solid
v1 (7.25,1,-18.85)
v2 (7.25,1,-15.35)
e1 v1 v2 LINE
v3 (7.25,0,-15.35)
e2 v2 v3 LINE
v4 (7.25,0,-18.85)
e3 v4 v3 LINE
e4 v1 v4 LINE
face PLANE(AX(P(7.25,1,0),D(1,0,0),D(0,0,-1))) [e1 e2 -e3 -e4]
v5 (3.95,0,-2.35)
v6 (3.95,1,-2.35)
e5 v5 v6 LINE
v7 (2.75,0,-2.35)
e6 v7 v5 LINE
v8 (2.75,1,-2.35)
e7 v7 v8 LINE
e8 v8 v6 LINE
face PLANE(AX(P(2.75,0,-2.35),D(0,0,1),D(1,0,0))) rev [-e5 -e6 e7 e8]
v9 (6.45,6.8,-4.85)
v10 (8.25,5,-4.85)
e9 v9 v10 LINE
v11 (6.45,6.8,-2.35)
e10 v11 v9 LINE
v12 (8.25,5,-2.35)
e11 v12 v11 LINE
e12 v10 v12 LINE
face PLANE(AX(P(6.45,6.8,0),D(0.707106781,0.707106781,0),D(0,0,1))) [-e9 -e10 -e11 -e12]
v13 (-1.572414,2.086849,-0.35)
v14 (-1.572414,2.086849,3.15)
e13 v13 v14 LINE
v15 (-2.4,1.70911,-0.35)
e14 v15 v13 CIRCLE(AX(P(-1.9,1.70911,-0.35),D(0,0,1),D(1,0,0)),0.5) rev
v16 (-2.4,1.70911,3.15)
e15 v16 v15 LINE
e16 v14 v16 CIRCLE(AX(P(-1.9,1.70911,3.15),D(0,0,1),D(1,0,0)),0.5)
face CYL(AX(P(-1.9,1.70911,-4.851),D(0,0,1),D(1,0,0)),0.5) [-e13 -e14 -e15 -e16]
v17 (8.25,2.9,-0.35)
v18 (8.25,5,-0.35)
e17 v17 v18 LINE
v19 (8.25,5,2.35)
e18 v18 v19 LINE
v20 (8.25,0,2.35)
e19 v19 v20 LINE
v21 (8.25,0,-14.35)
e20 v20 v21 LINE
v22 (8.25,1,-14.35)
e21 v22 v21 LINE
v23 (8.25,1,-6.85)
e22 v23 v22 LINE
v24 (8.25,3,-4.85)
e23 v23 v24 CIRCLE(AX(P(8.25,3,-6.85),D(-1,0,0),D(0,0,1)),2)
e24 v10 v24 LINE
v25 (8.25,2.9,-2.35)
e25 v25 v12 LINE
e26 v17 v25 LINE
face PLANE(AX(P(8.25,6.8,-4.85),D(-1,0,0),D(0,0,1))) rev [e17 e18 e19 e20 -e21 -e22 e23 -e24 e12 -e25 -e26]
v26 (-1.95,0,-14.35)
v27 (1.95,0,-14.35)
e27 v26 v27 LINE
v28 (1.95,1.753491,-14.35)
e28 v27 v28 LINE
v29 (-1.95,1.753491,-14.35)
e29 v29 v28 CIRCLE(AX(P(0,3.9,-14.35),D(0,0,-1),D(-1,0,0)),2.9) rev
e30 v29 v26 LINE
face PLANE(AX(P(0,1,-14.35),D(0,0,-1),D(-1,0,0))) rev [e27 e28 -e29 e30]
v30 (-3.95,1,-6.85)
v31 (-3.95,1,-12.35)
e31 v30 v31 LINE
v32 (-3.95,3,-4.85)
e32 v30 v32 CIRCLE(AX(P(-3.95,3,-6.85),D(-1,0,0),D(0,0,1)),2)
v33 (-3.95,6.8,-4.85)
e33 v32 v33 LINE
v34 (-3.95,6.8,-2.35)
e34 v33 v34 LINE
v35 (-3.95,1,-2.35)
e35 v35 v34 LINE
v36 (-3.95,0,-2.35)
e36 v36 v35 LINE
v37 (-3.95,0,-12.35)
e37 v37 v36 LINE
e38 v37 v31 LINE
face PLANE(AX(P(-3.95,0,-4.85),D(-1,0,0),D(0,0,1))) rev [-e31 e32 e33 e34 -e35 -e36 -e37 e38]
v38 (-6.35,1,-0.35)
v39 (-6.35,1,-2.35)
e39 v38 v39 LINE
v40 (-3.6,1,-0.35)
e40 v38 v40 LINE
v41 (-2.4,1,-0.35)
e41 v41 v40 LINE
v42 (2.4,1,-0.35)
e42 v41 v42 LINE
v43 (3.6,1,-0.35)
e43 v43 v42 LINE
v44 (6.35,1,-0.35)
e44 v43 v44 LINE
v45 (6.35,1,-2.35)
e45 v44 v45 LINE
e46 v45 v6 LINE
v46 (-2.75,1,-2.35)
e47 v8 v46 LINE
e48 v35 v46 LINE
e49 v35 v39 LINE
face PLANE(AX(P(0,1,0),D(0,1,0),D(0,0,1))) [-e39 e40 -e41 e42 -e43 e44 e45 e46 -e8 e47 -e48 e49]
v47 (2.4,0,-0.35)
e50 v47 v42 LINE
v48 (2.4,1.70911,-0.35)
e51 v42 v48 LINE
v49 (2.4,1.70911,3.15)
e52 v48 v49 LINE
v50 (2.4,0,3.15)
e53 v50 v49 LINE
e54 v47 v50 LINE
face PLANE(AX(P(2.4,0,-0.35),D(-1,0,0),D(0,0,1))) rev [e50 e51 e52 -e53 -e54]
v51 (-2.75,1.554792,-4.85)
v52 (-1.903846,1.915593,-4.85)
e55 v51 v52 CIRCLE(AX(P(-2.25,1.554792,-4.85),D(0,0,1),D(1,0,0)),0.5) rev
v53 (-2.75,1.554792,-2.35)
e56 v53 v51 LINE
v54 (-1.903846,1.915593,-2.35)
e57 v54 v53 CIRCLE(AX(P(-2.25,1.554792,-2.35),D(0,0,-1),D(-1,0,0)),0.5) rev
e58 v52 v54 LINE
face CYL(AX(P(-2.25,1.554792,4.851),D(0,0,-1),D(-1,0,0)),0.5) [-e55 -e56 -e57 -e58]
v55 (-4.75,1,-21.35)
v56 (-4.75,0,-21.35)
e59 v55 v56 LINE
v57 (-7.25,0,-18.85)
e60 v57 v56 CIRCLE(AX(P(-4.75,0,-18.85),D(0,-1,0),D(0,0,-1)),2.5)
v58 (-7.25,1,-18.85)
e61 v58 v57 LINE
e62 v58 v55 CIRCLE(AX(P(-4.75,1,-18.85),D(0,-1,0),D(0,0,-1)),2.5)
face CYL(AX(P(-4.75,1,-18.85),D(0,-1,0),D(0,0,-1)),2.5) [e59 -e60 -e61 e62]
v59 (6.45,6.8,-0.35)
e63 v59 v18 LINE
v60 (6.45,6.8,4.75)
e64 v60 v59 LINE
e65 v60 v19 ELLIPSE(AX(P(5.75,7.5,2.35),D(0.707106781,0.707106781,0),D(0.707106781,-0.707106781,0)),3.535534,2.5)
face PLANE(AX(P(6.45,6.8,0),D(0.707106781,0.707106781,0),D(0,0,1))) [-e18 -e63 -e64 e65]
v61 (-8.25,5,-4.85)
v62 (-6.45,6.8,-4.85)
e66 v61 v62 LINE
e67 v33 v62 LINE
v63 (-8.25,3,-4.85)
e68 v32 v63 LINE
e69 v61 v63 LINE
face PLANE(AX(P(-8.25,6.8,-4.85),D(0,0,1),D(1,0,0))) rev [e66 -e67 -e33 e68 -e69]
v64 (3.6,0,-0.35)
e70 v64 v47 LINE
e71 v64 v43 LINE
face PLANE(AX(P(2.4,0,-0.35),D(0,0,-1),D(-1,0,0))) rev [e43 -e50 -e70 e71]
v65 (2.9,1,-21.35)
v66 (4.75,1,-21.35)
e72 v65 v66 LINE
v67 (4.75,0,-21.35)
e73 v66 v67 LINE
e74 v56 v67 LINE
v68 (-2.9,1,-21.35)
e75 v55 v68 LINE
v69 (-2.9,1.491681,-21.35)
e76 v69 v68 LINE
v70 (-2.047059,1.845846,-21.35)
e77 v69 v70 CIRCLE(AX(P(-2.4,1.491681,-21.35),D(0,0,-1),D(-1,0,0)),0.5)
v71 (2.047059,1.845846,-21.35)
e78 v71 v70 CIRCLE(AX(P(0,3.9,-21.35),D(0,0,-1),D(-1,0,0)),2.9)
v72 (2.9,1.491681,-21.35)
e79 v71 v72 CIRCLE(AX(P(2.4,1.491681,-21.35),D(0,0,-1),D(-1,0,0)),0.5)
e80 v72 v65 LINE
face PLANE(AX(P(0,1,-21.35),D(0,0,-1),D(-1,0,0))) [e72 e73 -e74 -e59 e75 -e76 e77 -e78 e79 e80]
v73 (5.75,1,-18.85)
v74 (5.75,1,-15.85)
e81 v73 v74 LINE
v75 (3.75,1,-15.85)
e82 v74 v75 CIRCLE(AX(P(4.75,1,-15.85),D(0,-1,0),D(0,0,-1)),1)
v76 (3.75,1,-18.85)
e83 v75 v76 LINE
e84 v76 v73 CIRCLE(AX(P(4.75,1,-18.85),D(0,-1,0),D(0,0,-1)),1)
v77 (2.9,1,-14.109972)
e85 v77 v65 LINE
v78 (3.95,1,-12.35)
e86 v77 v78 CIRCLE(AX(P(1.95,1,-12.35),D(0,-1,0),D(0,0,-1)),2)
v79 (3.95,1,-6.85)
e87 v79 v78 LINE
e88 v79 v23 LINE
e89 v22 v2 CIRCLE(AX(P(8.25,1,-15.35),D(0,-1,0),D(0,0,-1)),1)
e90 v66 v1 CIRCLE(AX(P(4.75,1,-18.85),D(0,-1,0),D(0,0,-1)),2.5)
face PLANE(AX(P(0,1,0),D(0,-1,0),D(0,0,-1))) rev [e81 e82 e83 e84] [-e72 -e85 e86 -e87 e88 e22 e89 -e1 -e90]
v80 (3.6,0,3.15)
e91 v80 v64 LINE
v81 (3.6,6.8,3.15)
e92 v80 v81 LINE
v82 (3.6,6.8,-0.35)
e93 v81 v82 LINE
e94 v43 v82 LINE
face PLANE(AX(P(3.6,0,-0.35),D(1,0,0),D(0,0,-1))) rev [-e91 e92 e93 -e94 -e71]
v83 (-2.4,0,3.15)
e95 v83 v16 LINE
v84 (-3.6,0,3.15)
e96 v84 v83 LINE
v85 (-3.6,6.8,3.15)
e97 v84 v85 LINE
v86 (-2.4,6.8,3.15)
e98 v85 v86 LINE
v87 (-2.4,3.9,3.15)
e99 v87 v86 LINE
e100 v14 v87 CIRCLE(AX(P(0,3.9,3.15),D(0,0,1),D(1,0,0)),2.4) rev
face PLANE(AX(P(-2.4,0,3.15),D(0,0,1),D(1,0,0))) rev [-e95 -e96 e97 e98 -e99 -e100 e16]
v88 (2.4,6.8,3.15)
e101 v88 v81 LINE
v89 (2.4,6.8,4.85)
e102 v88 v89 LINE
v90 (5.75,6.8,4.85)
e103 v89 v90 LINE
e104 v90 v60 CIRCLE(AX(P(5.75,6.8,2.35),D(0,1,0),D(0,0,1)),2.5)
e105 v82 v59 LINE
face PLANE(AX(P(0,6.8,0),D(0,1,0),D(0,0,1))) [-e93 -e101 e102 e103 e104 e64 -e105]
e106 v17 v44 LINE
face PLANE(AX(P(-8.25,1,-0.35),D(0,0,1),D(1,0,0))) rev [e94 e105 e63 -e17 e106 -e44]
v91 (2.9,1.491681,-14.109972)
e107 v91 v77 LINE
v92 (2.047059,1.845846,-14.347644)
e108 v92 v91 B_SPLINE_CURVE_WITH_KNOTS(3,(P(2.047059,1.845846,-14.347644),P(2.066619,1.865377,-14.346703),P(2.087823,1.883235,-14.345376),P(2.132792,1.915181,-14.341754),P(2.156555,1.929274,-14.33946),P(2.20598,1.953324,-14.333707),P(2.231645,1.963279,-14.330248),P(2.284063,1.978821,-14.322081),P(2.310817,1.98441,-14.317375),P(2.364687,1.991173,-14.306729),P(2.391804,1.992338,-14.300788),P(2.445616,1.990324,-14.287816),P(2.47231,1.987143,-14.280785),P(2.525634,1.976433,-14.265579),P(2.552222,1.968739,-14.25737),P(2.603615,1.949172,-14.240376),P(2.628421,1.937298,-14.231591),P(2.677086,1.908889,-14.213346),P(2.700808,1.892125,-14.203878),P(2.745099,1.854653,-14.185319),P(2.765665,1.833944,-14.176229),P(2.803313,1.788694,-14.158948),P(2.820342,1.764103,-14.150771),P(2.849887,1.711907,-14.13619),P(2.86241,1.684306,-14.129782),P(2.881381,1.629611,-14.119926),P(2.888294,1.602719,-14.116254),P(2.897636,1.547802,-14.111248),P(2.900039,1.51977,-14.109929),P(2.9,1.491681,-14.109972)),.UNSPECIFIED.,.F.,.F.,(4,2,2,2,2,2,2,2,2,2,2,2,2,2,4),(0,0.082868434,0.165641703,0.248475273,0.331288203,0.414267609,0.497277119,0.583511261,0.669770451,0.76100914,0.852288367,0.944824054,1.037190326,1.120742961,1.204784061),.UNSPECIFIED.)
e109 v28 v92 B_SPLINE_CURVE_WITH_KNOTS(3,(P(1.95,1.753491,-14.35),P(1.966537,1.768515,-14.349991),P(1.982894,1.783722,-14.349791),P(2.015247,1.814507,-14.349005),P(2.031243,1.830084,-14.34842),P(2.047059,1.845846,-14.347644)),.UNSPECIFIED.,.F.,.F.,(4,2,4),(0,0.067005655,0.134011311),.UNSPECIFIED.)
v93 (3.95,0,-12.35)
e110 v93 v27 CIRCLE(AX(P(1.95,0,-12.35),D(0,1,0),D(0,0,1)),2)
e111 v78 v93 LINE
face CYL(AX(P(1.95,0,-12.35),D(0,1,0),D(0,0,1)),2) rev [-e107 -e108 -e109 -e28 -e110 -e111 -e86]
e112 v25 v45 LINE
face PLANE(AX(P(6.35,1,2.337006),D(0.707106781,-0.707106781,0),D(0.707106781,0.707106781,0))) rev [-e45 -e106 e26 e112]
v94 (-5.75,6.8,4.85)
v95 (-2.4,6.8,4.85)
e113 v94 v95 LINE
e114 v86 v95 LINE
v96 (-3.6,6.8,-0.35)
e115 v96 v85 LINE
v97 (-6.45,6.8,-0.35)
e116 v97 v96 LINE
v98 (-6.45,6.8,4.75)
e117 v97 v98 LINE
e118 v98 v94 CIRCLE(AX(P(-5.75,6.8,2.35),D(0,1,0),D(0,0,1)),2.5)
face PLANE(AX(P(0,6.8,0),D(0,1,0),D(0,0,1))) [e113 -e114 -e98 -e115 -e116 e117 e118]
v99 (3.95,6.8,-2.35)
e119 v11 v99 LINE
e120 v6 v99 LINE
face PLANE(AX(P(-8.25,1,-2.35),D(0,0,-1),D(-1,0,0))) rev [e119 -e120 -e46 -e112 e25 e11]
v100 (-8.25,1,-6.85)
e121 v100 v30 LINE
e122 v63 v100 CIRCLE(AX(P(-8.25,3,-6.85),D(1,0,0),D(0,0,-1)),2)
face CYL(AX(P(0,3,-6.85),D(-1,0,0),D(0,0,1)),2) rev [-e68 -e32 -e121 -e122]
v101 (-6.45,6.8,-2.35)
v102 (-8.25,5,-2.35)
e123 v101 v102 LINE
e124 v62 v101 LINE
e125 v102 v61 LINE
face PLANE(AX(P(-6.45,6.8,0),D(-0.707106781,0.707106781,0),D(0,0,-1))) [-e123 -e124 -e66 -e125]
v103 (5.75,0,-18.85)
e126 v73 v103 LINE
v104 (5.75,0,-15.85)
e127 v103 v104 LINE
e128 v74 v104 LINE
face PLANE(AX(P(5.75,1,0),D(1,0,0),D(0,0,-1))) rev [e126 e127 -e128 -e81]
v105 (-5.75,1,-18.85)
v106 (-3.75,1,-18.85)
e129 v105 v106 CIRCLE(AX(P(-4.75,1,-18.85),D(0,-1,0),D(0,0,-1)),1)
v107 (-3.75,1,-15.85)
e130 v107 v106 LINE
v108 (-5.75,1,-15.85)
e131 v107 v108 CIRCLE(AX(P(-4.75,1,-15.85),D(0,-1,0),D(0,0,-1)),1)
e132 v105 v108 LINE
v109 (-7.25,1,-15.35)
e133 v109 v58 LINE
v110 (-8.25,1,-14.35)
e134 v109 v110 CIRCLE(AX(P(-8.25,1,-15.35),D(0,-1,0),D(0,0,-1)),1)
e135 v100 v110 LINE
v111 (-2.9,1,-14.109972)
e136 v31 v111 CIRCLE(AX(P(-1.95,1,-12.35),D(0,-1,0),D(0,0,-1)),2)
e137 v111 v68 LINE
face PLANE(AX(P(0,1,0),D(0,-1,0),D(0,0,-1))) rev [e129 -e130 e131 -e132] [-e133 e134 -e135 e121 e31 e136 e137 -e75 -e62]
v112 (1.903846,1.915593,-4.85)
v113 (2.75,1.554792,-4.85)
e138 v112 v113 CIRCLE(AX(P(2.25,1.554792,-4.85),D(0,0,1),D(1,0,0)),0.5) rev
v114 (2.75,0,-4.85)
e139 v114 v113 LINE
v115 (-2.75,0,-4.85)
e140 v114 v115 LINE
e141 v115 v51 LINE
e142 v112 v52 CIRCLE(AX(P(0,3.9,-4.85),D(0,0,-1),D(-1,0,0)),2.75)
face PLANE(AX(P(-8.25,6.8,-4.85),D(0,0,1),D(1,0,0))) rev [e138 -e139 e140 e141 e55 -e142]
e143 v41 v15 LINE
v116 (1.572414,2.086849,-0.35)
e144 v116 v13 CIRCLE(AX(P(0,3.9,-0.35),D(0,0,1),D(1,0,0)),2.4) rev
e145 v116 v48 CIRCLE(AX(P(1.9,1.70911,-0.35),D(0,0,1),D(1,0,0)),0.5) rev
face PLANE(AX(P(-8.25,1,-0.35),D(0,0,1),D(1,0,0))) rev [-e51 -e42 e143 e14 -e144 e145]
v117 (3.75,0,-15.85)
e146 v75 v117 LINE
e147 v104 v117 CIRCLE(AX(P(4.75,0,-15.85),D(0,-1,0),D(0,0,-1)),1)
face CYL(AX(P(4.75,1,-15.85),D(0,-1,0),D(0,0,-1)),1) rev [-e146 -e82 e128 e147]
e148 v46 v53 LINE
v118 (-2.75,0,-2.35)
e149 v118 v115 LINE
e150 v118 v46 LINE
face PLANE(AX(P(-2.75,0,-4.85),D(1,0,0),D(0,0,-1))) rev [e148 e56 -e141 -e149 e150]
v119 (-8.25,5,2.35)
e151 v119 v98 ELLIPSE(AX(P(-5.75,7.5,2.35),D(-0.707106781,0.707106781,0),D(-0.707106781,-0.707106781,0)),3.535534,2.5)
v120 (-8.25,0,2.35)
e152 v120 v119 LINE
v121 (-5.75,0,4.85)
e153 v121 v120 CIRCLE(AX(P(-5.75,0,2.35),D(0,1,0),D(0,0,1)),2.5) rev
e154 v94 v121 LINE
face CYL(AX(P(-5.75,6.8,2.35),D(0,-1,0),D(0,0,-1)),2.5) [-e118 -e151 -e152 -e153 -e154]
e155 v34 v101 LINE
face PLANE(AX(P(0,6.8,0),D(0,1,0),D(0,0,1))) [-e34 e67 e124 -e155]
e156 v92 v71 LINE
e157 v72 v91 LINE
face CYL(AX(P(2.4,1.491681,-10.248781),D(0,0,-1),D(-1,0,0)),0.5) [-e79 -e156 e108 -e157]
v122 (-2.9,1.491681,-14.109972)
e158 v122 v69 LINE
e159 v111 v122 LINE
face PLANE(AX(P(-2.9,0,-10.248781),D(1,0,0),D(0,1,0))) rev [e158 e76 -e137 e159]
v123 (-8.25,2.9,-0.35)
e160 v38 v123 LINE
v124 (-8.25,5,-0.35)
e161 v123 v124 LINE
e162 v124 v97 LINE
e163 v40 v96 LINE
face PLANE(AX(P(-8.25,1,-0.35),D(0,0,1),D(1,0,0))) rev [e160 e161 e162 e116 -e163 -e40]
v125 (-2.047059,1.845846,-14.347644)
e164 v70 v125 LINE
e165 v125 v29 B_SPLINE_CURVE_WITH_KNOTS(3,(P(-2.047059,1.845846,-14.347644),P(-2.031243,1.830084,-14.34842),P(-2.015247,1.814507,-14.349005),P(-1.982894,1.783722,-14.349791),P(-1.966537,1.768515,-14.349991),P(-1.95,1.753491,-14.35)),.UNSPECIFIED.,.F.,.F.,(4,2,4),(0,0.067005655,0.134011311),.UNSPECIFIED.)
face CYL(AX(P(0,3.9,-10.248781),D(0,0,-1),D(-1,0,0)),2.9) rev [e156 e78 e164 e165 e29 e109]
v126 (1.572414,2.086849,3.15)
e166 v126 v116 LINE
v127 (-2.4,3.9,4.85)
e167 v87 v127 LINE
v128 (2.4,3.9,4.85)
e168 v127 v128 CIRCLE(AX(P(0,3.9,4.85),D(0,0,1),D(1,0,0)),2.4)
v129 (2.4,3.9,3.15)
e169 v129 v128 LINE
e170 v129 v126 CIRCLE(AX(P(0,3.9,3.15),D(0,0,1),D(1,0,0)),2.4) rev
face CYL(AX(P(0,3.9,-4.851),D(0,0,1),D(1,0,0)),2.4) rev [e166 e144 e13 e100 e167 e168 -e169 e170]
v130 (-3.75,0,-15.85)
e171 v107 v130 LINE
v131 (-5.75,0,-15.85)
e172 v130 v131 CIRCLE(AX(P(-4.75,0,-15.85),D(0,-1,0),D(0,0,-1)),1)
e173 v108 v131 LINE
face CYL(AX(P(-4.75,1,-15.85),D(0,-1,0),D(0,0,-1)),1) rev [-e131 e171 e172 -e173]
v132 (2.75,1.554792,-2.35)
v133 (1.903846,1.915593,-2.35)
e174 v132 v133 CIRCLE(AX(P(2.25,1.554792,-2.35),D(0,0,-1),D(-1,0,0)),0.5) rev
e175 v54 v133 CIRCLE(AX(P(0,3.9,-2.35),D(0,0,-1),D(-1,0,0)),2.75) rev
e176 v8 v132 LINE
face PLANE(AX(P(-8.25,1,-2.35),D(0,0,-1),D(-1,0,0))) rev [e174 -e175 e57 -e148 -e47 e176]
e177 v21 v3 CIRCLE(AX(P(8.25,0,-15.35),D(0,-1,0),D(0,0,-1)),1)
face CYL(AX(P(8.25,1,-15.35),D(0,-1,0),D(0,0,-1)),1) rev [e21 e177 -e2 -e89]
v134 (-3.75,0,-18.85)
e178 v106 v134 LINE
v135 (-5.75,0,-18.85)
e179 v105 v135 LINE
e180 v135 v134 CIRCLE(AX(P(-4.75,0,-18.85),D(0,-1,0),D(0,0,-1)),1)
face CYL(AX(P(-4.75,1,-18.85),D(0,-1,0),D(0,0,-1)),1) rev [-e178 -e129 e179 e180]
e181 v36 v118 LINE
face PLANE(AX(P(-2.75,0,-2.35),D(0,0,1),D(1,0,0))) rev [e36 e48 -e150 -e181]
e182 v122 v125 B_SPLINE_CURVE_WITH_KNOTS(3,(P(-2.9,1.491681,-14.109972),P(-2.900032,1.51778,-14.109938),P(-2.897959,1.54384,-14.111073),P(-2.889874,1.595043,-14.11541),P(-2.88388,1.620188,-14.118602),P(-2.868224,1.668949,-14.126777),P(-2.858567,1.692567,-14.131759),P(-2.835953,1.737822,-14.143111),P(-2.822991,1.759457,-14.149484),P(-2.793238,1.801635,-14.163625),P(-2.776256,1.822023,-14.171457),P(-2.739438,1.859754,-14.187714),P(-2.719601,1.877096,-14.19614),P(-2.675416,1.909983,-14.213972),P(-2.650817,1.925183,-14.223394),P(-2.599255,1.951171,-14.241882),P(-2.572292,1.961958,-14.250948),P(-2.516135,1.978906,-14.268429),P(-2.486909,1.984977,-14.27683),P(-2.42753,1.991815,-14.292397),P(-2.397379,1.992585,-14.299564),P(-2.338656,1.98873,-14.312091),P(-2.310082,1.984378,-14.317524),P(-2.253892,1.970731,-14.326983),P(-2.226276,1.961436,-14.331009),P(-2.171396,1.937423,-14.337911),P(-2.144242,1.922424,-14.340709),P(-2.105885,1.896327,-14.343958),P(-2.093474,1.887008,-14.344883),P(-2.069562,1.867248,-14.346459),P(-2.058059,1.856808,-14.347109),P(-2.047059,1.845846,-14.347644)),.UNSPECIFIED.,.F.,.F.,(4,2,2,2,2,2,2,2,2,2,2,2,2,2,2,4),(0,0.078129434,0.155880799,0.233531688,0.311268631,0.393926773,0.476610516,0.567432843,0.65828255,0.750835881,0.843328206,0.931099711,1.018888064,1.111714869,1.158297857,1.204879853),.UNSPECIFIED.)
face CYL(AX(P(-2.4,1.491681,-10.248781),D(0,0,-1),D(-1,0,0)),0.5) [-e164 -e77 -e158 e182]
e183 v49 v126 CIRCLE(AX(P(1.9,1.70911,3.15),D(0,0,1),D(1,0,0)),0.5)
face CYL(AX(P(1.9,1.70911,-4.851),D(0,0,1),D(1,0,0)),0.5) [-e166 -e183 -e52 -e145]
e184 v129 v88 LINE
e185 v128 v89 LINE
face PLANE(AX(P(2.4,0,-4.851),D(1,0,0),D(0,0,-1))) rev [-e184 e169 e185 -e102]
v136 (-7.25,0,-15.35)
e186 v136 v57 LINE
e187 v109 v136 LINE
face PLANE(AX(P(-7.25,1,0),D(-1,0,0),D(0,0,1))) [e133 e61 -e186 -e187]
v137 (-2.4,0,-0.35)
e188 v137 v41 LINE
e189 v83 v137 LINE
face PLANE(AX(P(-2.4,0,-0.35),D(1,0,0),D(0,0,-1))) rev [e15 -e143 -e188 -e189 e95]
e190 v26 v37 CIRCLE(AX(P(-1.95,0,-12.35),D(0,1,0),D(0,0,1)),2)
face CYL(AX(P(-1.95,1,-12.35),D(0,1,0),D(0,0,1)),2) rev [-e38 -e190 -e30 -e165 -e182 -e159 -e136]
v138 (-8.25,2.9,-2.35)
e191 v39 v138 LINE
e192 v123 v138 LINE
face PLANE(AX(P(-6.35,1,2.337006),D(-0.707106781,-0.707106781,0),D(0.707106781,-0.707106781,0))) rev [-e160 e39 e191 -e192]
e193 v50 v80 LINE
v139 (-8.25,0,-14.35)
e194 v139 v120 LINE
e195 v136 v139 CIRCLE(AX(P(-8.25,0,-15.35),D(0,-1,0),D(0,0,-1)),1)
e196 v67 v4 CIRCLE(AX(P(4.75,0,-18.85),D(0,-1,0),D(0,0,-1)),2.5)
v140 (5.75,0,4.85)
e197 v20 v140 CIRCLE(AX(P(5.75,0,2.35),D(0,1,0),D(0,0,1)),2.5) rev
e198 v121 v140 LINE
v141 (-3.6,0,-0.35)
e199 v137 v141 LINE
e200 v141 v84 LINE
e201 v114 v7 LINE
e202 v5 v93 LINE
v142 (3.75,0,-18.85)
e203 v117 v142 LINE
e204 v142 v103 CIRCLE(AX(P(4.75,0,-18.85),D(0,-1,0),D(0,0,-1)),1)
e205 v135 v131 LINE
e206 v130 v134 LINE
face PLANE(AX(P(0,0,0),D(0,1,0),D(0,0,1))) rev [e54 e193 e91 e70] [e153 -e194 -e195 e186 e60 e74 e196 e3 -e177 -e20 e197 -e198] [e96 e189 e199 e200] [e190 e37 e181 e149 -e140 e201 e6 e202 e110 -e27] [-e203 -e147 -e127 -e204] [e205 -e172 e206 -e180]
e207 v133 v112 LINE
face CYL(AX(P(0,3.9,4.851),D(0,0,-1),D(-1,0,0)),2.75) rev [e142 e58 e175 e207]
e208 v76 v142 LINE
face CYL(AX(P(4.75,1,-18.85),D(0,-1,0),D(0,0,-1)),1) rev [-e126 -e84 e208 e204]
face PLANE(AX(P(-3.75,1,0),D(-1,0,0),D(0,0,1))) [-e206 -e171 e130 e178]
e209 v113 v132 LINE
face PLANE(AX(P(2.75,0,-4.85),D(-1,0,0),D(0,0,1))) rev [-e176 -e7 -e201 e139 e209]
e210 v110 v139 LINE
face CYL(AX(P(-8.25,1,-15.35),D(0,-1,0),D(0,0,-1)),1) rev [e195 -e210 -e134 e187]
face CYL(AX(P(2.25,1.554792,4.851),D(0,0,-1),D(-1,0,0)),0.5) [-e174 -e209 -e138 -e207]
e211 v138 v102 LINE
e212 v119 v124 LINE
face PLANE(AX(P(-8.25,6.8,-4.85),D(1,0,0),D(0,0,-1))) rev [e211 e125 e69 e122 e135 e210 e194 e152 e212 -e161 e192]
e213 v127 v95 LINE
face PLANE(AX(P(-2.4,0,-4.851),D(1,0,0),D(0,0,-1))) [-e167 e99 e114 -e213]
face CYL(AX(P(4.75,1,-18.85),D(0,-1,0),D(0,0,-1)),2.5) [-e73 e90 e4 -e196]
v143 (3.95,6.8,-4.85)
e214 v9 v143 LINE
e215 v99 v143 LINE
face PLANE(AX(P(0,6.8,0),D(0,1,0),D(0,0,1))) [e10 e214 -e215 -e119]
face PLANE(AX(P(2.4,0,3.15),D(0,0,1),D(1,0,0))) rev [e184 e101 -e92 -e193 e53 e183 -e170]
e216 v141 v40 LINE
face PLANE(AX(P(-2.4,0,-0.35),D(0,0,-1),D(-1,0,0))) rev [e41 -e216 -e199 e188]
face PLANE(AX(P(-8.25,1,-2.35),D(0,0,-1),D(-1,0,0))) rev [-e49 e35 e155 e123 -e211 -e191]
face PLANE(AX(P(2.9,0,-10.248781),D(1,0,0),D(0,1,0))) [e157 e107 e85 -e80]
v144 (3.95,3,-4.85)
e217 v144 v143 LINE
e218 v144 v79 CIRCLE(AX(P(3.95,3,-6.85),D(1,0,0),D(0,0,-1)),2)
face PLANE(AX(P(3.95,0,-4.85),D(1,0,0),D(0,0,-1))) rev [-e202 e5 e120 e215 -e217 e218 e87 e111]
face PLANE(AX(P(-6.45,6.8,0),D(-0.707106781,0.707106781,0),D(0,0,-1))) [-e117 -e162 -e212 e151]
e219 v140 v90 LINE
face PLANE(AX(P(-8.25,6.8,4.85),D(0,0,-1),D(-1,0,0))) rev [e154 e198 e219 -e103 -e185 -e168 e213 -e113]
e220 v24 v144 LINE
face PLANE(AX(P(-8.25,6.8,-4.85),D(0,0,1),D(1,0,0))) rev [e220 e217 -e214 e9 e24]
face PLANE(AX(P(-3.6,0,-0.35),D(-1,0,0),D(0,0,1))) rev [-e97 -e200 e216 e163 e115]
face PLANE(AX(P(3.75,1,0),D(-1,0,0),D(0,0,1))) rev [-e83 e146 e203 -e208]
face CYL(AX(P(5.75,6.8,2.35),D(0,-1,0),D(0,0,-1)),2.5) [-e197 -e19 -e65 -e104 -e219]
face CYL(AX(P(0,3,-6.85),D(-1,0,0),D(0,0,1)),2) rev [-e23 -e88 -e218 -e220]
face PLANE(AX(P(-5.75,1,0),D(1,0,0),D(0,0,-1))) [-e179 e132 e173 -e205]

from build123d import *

# Parameters (mm, degrees)
SKETCH1_W           = 16.5
SKETCH1_H           = 9.7
BOSS_EXTRUDE1_DEPTH = 6.8
SKETCH2_W           = 16.5
SKETCH2_H           = 2
CUT_EXTRUDE1_DEPTH  = 5.8
CUT_EXTRUDE2_REACH  = 16.436
SKETCH3_R           = 2.75
CUT_EXTRUDE3_REACH  = 16.436
SKETCH4_R           = 2.4
SKETCH4_W           = 4.8
SKETCH4_H           = 2.9
SKETCH5_W           = 1.2
SKETCH5_H           = 2.5
SKETCH5_H_2         = 3.5
CUT_EXTRUDE4_DEPTH  = 12.739889267
BOSS_EXTRUDE2_DEPTH = 2
CHAMFER1_SIZE       = 1.8
FILLET4_R           = 2.5
SKETCH8_W           = 2.5
SKETCH8_H           = 9.5
SKETCH8_W_2         = 1.8
BOSS_EXTRUDE3_DEPTH = 1
BOSS_EXTRUDE5_DEPTH = 7
FILLET1_START       = -22
FILLET1_DEPTH       = 25.15
FILLET1_2_DEPTH     = 7.65
FILLET1_START_2     = -14.35
FILLET1_3_DEPTH     = 12
FILLET1_START_3     = -0.35
FILLET1_4_DEPTH     = 3.5
FILLET5_R           = 2


with BuildPart() as part:
    # Sketch1 → Boss-Extrude1 (new body)
    with BuildSketch(Plane(origin=(0, 0, 0), x_dir=(1, 0, 0), z_dir=(0, 1, 0))):
        Rectangle(SKETCH1_W, SKETCH1_H)
    extrude(amount=BOSS_EXTRUDE1_DEPTH)

    # Sketch2 → Cut-Extrude1 (cut)
    with BuildSketch(Plane(origin=(0, 6.8, 0), x_dir=(1, 0, 0), z_dir=(0, 1, 0))):
        with Locations((0, 1.35)):
            Rectangle(SKETCH2_W, SKETCH2_H)
    extrude(amount=-CUT_EXTRUDE1_DEPTH, mode=Mode.SUBTRACT)

    # Sketch3 → Cut-Extrude2 (cut, up to next)
    with BuildSketch(Plane(origin=(0, 0, -4.85), x_dir=(-1, 0, 0), z_dir=(0, 0, -1)), mode=Mode.PRIVATE) as cut_extrude2_sk1:
        with Locations((0, 3.9)):
            Circle(SKETCH3_R)
    cut_extrude2_tool1 = extrude(cut_extrude2_sk1.sketch, amount=-CUT_EXTRUDE2_REACH, mode=Mode.PRIVATE) & part.part
    # Sketch3 → Cut-Extrude2 (cut, up to next)
    with BuildSketch(Plane(origin=(0, 0, -4.85), x_dir=(-1, 0, 0), z_dir=(0, 0, -1)), mode=Mode.PRIVATE) as cut_extrude2_sk2:
        with BuildLine():
            Line((-2.75, 6.8), (-2.75, 3.9))
            ThreePointArc((-2.75, 3.9), (0, 6.65), (2.75, 3.9))
            Line((2.75, 3.9), (2.75, 6.8))
            Line((2.75, 6.8), (-2.75, 6.8))
        make_face()
    cut_extrude2_tool2 = extrude(cut_extrude2_sk2.sketch, amount=-CUT_EXTRUDE2_REACH, mode=Mode.PRIVATE) & part.part
    add(cut_extrude2_tool1.solids().sort_by_distance((0, 3.9, -4.85))[0], mode=Mode.SUBTRACT)
    add(cut_extrude2_tool2.solids().sort_by_distance((2.687823, 5.35, -4.85))[0], mode=Mode.SUBTRACT)

    # Sketch4 → Cut-Extrude3 (cut, up to next)
    with BuildSketch(Plane.XY.offset(4.85), mode=Mode.PRIVATE) as cut_extrude3_sk1:
        with Locations((0, 3.9)):
            Circle(SKETCH4_R)
    cut_extrude3_tool1 = extrude(cut_extrude3_sk1.sketch, amount=-CUT_EXTRUDE3_REACH, mode=Mode.PRIVATE) & part.part
    # Sketch4 → Cut-Extrude3 (cut, up to next)
    with BuildSketch(Plane.XY.offset(4.85), mode=Mode.PRIVATE) as cut_extrude3_sk2:
        with Locations((0, 5.35)):
            Rectangle(SKETCH4_W, SKETCH4_H)
    cut_extrude3_tool2 = extrude(cut_extrude3_sk2.sketch, amount=-CUT_EXTRUDE3_REACH, mode=Mode.PRIVATE) & part.part
    add(cut_extrude3_tool1.solids().sort_by_distance((0, 3.9, 4.85))[0], mode=Mode.SUBTRACT)
    add(cut_extrude3_tool2.solids().sort_by_distance((0, 5.35, 4.85))[0], mode=Mode.SUBTRACT)

    # Sketch5 → Cut-Extrude4 (cut, through all)
    with BuildSketch(Plane(origin=(0, 6.8, 0), x_dir=(1, 0, 0), z_dir=(0, 1, 0))):
        with Locations((-3.35, 3.6)):
            Rectangle(SKETCH5_W, SKETCH5_H)
        with Locations((3.35, 3.6)):
            Rectangle(SKETCH5_W, SKETCH5_H)
        with Locations((-3, -1.4)):
            Rectangle(SKETCH5_W, SKETCH5_H_2)
        with Locations((3, -1.4)):
            Rectangle(SKETCH5_W, SKETCH5_H_2)
    extrude(amount=-CUT_EXTRUDE4_DEPTH, mode=Mode.SUBTRACT)

    # Sketch7 → Boss-Extrude2 (add)
    with BuildSketch(Plane.XY.offset(-2.35)):
        Polygon((-6.35, 1), (-8.25, 2.9), (-8.25, 1), align=None)
        Polygon((8.25, 2.9), (8.25, 1), (6.35, 1), align=None)
    extrude(amount=BOSS_EXTRUDE2_DEPTH)

    # Chamfer1
    chamfer1_edges = [part.edges().sort_by_distance(p)[0] for p in [
        (-8.25, 6.8, -3.6),
        (8.25, 6.8, -3.6),
        (-8.25, 6.8, 2.25),
        (8.25, 6.8, 2.25),
    ]]
    chamfer(chamfer1_edges, length=CHAMFER1_SIZE)

    # Fillet4
    fillet4_edges = [part.edges().sort_by_distance(p)[0] for p in [
        (8.25, 2.5, 4.85),
        (-8.25, 2.5, 4.85),
    ]]
    fillet(fillet4_edges, radius=FILLET4_R)

    # Sketch8 → Boss-Extrude3 (add)
    # profile 1 of 7: a face of its own
    with BuildSketch(Plane.XZ):
        with Locations((-7, -9.6)):
            Rectangle(SKETCH8_W, SKETCH8_H)
    # profile 2 of 7: a face of its own
    with BuildSketch(Plane.XZ):
        with Locations((7, -9.6)):
            Rectangle(SKETCH8_W, SKETCH8_H)
    # profile 3 of 7: a face of its own
    with BuildSketch(Plane.XZ):
        with BuildLine():
            Line((8.25, -14.35), (5.75, -14.35))
            Line((5.75, -14.35), (5.75, -15.85))
            Line((5.75, -15.85), (7.25, -15.85))
            Line((7.25, -15.85), (7.25, -15.35))
            ThreePointArc((7.25, -15.35), (7.542893219, -14.642893219), (8.25, -14.35))
        make_face()
    # profile 4 of 7: a face of its own
    with BuildSketch(Plane.XZ):
        with BuildLine():
            Line((-7.25, -15.85), (-5.75, -15.85))
            Line((-5.75, -15.85), (-5.75, -14.35))
            Line((-5.75, -14.35), (-8.25, -14.35))
            ThreePointArc((-8.25, -14.35), (-7.542893219, -14.642893219), (-7.25, -15.35))
            Line((-7.25, -15.35), (-7.25, -15.85))
        make_face()
    # profile 5 of 7: a face of its own
    with BuildSketch(Plane.XZ):
        with BuildLine():
            Line((-5.75, -14.35), (-5.75, -15.85))
            Line((-5.75, -15.85), (-7.25, -15.85))
            Line((-7.25, -15.85), (-7.25, -18.85))
            ThreePointArc((-7.25, -18.85), (-6.517766953, -20.617766953), (-4.75, -21.35))
            Line((-4.75, -21.35), (4.75, -21.35))
            ThreePointArc((4.75, -21.35), (6.517766953, -20.617766953), (7.25, -18.85))
            Line((7.25, -18.85), (7.25, -15.85))
            Line((7.25, -15.85), (5.75, -15.85))
            Line((5.75, -15.85), (5.75, -14.35))
            Line((5.75, -14.35), (3.95, -14.35))
            Line((3.95, -14.35), (-3.95, -14.35))
            Line((-3.95, -14.35), (-5.75, -14.35))
        make_face()
        with BuildLine():
            ThreePointArc((-3.75, -18.85), (-4.75, -19.85), (-5.75, -18.85))
            Line((-5.75, -18.85), (-5.75, -15.85))
            ThreePointArc((-5.75, -15.85), (-4.75, -14.85), (-3.75, -15.85))
            Line((-3.75, -15.85), (-3.75, -18.85))
        make_face(mode=Mode.SUBTRACT)
        with BuildLine():
            ThreePointArc((3.75, -15.85), (4.75, -14.85), (5.75, -15.85))
            Line((5.75, -15.85), (5.75, -18.85))
            ThreePointArc((5.75, -18.85), (4.75, -19.85), (3.75, -18.85))
            Line((3.75, -18.85), (3.75, -15.85))
        make_face(mode=Mode.SUBTRACT)
    # profile 6 of 7: a face of its own
    with BuildSketch(Plane.XZ):
        with Locations((-4.85, -9.6)):
            Rectangle(SKETCH8_W_2, SKETCH8_H)
    # profile 7 of 7: a face of its own
    with BuildSketch(Plane.XZ):
        with Locations((4.85, -9.6)):
            Rectangle(SKETCH8_W_2, SKETCH8_H)
    extrude(amount=-BOSS_EXTRUDE3_DEPTH)

    # Sketch11 → Boss-Extrude5 (add)
    with BuildSketch(Plane(origin=(0, 0, -21.35), x_dir=(-1, 0, 0), z_dir=(0, 0, -1))):
        with BuildLine():
            Line((2.9, 1), (2.9, 3.9))
            ThreePointArc((2.9, 3.9), (2.050609665, 1.849390335), (0, 1))
            Line((0, 1), (2.9, 1))
        make_face()
        with BuildLine():
            ThreePointArc((0, 1), (-2.050609665, 1.849390335), (-2.9, 3.9))
            Line((-2.9, 3.9), (-2.9, 1))
            Line((-2.9, 1), (0, 1))
        make_face()
    extrude(amount=-BOSS_EXTRUDE5_DEPTH)

    # Fillet1: read off the stored shape, not the designer's step
    # Fillet1 outline → Fillet1 (cut)
    with BuildSketch(Plane.XY.offset(FILLET1_START)):
        with BuildLine():
            Line((-2.9, 3.9), (-2.9, 1.491681084))
            ThreePointArc((-2.9, 1.491681084), (-2.792530688, 1.801390075), (-2.516321365, 1.977962217))
            ThreePointArc((-2.516321365, 1.977962217), (-2.394047935, 2.033592906), (-2.261376801, 2.054662672))
            ThreePointArc((-2.261376801, 2.054662672), (-1.923333419, 2.208565025), (-1.572413793, 2.086849465))
            ThreePointArc((-1.572413793, 2.086849465), (-2.183322366, 2.903454242), (-2.4, 3.9))
            Line((-2.4, 3.9), (-2.4, 2.557427842))
            ThreePointArc((-2.4, 2.557427842), (-2.661061818, 3.206278154), (-2.75, 3.9))
            Line((-2.75, 3.9), (-2.75, 2.979402368))
            ThreePointArc((-2.75, 2.979402368), (-2.862254356, 3.433631047), (-2.9, 3.9))
        make_face()
        with BuildLine():
            ThreePointArc((2.4, 3.9), (2.183322366, 2.903454242), (1.572413793, 2.086849465))
            ThreePointArc((1.572413793, 2.086849465), (1.923333419, 2.208565025), (2.261376801, 2.054662672))
            ThreePointArc((2.261376801, 2.054662672), (2.394047935, 2.033592906), (2.516321365, 1.977962217))
            ThreePointArc((2.516321365, 1.977962217), (2.792530688, 1.801390075), (2.9, 1.491681084))
            Line((2.9, 1.491681084), (2.9, 3.9))
            ThreePointArc((2.9, 3.9), (2.862254356, 3.433631047), (2.75, 2.979402368))
            Line((2.75, 2.979402368), (2.75, 3.9))
            ThreePointArc((2.75, 3.9), (2.661061818, 3.206278154), (2.4, 2.557427842))
            Line((2.4, 2.557427842), (2.4, 3.9))
        make_face()
    extrude(amount=FILLET1_DEPTH, mode=Mode.SUBTRACT)

    # Fillet1 2 outline → Fillet1 2 (cut)
    with BuildSketch(Plane.XY.offset(FILLET1_START)):
        with BuildLine():
            ThreePointArc((-2.516321365, 1.977962217), (-2.264497484, 1.97297005), (-2.047058824, 1.845845631))
            ThreePointArc((-2.047058824, 1.845845631), (-2.150447744, 1.954344712), (-2.248093276, 2.068040224))
            ThreePointArc((-2.248093276, 2.068040224), (-2.254798094, 2.06141406), (-2.261376801, 2.054662672))
            ThreePointArc((-2.261376801, 2.054662672), (-2.394047935, 2.033592906), (-2.516321365, 1.977962217))
        make_face()
        with BuildLine():
            ThreePointArc((2.047058824, 1.845845631), (2.264497484, 1.97297005), (2.516321365, 1.977962217))
            ThreePointArc((2.516321365, 1.977962217), (2.394047935, 2.033592906), (2.261376801, 2.054662672))
            ThreePointArc((2.261376801, 2.054662672), (2.254798094, 2.06141406), (2.248093276, 2.068040224))
            ThreePointArc((2.248093276, 2.068040224), (2.150447744, 1.954344712), (2.047058824, 1.845845631))
        make_face()
    extrude(amount=FILLET1_2_DEPTH, mode=Mode.SUBTRACT)

    # Fillet1 3 outline → Fillet1 3 (cut)
    with BuildSketch(Plane.XY.offset(FILLET1_START_2)):
        with BuildLine():
            ThreePointArc((-2.516321365, 1.977962217), (-2.641945637, 1.929245147), (-2.75, 1.848752506))
            Line((-2.75, 1.848752506), (-2.75, 1.55479212))
            ThreePointArc((-2.75, 1.55479212), (-2.687698916, 1.796493711), (-2.516321365, 1.977962217))
        make_face()
        with BuildLine():
            ThreePointArc((-2.261376801, 2.054662672), (-2.068743309, 2.020781403), (-1.903846154, 1.915593332))
            ThreePointArc((-1.903846154, 1.915593332), (-2.01831936, 2.032143753), (-2.125669903, 2.155285851))
            ThreePointArc((-2.125669903, 2.155285851), (-2.197803986, 2.1107474), (-2.261376801, 2.054662672))
        make_face()
        with BuildLine():
            ThreePointArc((2.261376801, 2.054662672), (2.197803986, 2.1107474), (2.125669903, 2.155285851))
            ThreePointArc((2.125669903, 2.155285851), (2.01831936, 2.032143753), (1.903846154, 1.915593332))
            ThreePointArc((1.903846154, 1.915593332), (2.068743309, 2.020781403), (2.261376801, 2.054662672))
        make_face()
        with BuildLine():
            ThreePointArc((2.75, 1.848752506), (2.641945637, 1.929245147), (2.516321365, 1.977962217))
            ThreePointArc((2.516321365, 1.977962217), (2.687698916, 1.796493711), (2.75, 1.55479212))
            Line((2.75, 1.55479212), (2.75, 1.848752506))
        make_face()
    extrude(amount=FILLET1_3_DEPTH, mode=Mode.SUBTRACT)

    # Fillet1 4 outline → Fillet1 4 (cut)
    with BuildSketch(Plane.XY.offset(FILLET1_START_3)):
        with BuildLine():
            Line((-2.4, 2.031761721), (-2.4, 1.70910977))
            ThreePointArc((-2.4, 1.70910977), (-2.364051937, 1.895270453), (-2.261376801, 2.054662672))
            ThreePointArc((-2.261376801, 2.054662672), (-2.331496818, 2.048105681), (-2.4, 2.031761721))
        make_face()
        with BuildLine():
            ThreePointArc((2.261376801, 2.054662672), (2.364051937, 1.895270453), (2.4, 1.70910977))
            Line((2.4, 1.70910977), (2.4, 2.031761721))
            ThreePointArc((2.4, 2.031761721), (2.331496818, 2.048105681), (2.261376801, 2.054662672))
        make_face()
    extrude(amount=FILLET1_4_DEPTH, mode=Mode.SUBTRACT)

    # Fillet5
    fillet5_edges = [part.edges().sort_by_distance(p)[0] for p in [
        (-3.95, 0.5, -14.35),
        (3.95, 0.5, -14.35),
        (6.1, 1, -4.85),
        (-6.1, 1, -4.85),
    ]]
    fillet(fillet5_edges, radius=FILLET5_R)


solid = part.part
